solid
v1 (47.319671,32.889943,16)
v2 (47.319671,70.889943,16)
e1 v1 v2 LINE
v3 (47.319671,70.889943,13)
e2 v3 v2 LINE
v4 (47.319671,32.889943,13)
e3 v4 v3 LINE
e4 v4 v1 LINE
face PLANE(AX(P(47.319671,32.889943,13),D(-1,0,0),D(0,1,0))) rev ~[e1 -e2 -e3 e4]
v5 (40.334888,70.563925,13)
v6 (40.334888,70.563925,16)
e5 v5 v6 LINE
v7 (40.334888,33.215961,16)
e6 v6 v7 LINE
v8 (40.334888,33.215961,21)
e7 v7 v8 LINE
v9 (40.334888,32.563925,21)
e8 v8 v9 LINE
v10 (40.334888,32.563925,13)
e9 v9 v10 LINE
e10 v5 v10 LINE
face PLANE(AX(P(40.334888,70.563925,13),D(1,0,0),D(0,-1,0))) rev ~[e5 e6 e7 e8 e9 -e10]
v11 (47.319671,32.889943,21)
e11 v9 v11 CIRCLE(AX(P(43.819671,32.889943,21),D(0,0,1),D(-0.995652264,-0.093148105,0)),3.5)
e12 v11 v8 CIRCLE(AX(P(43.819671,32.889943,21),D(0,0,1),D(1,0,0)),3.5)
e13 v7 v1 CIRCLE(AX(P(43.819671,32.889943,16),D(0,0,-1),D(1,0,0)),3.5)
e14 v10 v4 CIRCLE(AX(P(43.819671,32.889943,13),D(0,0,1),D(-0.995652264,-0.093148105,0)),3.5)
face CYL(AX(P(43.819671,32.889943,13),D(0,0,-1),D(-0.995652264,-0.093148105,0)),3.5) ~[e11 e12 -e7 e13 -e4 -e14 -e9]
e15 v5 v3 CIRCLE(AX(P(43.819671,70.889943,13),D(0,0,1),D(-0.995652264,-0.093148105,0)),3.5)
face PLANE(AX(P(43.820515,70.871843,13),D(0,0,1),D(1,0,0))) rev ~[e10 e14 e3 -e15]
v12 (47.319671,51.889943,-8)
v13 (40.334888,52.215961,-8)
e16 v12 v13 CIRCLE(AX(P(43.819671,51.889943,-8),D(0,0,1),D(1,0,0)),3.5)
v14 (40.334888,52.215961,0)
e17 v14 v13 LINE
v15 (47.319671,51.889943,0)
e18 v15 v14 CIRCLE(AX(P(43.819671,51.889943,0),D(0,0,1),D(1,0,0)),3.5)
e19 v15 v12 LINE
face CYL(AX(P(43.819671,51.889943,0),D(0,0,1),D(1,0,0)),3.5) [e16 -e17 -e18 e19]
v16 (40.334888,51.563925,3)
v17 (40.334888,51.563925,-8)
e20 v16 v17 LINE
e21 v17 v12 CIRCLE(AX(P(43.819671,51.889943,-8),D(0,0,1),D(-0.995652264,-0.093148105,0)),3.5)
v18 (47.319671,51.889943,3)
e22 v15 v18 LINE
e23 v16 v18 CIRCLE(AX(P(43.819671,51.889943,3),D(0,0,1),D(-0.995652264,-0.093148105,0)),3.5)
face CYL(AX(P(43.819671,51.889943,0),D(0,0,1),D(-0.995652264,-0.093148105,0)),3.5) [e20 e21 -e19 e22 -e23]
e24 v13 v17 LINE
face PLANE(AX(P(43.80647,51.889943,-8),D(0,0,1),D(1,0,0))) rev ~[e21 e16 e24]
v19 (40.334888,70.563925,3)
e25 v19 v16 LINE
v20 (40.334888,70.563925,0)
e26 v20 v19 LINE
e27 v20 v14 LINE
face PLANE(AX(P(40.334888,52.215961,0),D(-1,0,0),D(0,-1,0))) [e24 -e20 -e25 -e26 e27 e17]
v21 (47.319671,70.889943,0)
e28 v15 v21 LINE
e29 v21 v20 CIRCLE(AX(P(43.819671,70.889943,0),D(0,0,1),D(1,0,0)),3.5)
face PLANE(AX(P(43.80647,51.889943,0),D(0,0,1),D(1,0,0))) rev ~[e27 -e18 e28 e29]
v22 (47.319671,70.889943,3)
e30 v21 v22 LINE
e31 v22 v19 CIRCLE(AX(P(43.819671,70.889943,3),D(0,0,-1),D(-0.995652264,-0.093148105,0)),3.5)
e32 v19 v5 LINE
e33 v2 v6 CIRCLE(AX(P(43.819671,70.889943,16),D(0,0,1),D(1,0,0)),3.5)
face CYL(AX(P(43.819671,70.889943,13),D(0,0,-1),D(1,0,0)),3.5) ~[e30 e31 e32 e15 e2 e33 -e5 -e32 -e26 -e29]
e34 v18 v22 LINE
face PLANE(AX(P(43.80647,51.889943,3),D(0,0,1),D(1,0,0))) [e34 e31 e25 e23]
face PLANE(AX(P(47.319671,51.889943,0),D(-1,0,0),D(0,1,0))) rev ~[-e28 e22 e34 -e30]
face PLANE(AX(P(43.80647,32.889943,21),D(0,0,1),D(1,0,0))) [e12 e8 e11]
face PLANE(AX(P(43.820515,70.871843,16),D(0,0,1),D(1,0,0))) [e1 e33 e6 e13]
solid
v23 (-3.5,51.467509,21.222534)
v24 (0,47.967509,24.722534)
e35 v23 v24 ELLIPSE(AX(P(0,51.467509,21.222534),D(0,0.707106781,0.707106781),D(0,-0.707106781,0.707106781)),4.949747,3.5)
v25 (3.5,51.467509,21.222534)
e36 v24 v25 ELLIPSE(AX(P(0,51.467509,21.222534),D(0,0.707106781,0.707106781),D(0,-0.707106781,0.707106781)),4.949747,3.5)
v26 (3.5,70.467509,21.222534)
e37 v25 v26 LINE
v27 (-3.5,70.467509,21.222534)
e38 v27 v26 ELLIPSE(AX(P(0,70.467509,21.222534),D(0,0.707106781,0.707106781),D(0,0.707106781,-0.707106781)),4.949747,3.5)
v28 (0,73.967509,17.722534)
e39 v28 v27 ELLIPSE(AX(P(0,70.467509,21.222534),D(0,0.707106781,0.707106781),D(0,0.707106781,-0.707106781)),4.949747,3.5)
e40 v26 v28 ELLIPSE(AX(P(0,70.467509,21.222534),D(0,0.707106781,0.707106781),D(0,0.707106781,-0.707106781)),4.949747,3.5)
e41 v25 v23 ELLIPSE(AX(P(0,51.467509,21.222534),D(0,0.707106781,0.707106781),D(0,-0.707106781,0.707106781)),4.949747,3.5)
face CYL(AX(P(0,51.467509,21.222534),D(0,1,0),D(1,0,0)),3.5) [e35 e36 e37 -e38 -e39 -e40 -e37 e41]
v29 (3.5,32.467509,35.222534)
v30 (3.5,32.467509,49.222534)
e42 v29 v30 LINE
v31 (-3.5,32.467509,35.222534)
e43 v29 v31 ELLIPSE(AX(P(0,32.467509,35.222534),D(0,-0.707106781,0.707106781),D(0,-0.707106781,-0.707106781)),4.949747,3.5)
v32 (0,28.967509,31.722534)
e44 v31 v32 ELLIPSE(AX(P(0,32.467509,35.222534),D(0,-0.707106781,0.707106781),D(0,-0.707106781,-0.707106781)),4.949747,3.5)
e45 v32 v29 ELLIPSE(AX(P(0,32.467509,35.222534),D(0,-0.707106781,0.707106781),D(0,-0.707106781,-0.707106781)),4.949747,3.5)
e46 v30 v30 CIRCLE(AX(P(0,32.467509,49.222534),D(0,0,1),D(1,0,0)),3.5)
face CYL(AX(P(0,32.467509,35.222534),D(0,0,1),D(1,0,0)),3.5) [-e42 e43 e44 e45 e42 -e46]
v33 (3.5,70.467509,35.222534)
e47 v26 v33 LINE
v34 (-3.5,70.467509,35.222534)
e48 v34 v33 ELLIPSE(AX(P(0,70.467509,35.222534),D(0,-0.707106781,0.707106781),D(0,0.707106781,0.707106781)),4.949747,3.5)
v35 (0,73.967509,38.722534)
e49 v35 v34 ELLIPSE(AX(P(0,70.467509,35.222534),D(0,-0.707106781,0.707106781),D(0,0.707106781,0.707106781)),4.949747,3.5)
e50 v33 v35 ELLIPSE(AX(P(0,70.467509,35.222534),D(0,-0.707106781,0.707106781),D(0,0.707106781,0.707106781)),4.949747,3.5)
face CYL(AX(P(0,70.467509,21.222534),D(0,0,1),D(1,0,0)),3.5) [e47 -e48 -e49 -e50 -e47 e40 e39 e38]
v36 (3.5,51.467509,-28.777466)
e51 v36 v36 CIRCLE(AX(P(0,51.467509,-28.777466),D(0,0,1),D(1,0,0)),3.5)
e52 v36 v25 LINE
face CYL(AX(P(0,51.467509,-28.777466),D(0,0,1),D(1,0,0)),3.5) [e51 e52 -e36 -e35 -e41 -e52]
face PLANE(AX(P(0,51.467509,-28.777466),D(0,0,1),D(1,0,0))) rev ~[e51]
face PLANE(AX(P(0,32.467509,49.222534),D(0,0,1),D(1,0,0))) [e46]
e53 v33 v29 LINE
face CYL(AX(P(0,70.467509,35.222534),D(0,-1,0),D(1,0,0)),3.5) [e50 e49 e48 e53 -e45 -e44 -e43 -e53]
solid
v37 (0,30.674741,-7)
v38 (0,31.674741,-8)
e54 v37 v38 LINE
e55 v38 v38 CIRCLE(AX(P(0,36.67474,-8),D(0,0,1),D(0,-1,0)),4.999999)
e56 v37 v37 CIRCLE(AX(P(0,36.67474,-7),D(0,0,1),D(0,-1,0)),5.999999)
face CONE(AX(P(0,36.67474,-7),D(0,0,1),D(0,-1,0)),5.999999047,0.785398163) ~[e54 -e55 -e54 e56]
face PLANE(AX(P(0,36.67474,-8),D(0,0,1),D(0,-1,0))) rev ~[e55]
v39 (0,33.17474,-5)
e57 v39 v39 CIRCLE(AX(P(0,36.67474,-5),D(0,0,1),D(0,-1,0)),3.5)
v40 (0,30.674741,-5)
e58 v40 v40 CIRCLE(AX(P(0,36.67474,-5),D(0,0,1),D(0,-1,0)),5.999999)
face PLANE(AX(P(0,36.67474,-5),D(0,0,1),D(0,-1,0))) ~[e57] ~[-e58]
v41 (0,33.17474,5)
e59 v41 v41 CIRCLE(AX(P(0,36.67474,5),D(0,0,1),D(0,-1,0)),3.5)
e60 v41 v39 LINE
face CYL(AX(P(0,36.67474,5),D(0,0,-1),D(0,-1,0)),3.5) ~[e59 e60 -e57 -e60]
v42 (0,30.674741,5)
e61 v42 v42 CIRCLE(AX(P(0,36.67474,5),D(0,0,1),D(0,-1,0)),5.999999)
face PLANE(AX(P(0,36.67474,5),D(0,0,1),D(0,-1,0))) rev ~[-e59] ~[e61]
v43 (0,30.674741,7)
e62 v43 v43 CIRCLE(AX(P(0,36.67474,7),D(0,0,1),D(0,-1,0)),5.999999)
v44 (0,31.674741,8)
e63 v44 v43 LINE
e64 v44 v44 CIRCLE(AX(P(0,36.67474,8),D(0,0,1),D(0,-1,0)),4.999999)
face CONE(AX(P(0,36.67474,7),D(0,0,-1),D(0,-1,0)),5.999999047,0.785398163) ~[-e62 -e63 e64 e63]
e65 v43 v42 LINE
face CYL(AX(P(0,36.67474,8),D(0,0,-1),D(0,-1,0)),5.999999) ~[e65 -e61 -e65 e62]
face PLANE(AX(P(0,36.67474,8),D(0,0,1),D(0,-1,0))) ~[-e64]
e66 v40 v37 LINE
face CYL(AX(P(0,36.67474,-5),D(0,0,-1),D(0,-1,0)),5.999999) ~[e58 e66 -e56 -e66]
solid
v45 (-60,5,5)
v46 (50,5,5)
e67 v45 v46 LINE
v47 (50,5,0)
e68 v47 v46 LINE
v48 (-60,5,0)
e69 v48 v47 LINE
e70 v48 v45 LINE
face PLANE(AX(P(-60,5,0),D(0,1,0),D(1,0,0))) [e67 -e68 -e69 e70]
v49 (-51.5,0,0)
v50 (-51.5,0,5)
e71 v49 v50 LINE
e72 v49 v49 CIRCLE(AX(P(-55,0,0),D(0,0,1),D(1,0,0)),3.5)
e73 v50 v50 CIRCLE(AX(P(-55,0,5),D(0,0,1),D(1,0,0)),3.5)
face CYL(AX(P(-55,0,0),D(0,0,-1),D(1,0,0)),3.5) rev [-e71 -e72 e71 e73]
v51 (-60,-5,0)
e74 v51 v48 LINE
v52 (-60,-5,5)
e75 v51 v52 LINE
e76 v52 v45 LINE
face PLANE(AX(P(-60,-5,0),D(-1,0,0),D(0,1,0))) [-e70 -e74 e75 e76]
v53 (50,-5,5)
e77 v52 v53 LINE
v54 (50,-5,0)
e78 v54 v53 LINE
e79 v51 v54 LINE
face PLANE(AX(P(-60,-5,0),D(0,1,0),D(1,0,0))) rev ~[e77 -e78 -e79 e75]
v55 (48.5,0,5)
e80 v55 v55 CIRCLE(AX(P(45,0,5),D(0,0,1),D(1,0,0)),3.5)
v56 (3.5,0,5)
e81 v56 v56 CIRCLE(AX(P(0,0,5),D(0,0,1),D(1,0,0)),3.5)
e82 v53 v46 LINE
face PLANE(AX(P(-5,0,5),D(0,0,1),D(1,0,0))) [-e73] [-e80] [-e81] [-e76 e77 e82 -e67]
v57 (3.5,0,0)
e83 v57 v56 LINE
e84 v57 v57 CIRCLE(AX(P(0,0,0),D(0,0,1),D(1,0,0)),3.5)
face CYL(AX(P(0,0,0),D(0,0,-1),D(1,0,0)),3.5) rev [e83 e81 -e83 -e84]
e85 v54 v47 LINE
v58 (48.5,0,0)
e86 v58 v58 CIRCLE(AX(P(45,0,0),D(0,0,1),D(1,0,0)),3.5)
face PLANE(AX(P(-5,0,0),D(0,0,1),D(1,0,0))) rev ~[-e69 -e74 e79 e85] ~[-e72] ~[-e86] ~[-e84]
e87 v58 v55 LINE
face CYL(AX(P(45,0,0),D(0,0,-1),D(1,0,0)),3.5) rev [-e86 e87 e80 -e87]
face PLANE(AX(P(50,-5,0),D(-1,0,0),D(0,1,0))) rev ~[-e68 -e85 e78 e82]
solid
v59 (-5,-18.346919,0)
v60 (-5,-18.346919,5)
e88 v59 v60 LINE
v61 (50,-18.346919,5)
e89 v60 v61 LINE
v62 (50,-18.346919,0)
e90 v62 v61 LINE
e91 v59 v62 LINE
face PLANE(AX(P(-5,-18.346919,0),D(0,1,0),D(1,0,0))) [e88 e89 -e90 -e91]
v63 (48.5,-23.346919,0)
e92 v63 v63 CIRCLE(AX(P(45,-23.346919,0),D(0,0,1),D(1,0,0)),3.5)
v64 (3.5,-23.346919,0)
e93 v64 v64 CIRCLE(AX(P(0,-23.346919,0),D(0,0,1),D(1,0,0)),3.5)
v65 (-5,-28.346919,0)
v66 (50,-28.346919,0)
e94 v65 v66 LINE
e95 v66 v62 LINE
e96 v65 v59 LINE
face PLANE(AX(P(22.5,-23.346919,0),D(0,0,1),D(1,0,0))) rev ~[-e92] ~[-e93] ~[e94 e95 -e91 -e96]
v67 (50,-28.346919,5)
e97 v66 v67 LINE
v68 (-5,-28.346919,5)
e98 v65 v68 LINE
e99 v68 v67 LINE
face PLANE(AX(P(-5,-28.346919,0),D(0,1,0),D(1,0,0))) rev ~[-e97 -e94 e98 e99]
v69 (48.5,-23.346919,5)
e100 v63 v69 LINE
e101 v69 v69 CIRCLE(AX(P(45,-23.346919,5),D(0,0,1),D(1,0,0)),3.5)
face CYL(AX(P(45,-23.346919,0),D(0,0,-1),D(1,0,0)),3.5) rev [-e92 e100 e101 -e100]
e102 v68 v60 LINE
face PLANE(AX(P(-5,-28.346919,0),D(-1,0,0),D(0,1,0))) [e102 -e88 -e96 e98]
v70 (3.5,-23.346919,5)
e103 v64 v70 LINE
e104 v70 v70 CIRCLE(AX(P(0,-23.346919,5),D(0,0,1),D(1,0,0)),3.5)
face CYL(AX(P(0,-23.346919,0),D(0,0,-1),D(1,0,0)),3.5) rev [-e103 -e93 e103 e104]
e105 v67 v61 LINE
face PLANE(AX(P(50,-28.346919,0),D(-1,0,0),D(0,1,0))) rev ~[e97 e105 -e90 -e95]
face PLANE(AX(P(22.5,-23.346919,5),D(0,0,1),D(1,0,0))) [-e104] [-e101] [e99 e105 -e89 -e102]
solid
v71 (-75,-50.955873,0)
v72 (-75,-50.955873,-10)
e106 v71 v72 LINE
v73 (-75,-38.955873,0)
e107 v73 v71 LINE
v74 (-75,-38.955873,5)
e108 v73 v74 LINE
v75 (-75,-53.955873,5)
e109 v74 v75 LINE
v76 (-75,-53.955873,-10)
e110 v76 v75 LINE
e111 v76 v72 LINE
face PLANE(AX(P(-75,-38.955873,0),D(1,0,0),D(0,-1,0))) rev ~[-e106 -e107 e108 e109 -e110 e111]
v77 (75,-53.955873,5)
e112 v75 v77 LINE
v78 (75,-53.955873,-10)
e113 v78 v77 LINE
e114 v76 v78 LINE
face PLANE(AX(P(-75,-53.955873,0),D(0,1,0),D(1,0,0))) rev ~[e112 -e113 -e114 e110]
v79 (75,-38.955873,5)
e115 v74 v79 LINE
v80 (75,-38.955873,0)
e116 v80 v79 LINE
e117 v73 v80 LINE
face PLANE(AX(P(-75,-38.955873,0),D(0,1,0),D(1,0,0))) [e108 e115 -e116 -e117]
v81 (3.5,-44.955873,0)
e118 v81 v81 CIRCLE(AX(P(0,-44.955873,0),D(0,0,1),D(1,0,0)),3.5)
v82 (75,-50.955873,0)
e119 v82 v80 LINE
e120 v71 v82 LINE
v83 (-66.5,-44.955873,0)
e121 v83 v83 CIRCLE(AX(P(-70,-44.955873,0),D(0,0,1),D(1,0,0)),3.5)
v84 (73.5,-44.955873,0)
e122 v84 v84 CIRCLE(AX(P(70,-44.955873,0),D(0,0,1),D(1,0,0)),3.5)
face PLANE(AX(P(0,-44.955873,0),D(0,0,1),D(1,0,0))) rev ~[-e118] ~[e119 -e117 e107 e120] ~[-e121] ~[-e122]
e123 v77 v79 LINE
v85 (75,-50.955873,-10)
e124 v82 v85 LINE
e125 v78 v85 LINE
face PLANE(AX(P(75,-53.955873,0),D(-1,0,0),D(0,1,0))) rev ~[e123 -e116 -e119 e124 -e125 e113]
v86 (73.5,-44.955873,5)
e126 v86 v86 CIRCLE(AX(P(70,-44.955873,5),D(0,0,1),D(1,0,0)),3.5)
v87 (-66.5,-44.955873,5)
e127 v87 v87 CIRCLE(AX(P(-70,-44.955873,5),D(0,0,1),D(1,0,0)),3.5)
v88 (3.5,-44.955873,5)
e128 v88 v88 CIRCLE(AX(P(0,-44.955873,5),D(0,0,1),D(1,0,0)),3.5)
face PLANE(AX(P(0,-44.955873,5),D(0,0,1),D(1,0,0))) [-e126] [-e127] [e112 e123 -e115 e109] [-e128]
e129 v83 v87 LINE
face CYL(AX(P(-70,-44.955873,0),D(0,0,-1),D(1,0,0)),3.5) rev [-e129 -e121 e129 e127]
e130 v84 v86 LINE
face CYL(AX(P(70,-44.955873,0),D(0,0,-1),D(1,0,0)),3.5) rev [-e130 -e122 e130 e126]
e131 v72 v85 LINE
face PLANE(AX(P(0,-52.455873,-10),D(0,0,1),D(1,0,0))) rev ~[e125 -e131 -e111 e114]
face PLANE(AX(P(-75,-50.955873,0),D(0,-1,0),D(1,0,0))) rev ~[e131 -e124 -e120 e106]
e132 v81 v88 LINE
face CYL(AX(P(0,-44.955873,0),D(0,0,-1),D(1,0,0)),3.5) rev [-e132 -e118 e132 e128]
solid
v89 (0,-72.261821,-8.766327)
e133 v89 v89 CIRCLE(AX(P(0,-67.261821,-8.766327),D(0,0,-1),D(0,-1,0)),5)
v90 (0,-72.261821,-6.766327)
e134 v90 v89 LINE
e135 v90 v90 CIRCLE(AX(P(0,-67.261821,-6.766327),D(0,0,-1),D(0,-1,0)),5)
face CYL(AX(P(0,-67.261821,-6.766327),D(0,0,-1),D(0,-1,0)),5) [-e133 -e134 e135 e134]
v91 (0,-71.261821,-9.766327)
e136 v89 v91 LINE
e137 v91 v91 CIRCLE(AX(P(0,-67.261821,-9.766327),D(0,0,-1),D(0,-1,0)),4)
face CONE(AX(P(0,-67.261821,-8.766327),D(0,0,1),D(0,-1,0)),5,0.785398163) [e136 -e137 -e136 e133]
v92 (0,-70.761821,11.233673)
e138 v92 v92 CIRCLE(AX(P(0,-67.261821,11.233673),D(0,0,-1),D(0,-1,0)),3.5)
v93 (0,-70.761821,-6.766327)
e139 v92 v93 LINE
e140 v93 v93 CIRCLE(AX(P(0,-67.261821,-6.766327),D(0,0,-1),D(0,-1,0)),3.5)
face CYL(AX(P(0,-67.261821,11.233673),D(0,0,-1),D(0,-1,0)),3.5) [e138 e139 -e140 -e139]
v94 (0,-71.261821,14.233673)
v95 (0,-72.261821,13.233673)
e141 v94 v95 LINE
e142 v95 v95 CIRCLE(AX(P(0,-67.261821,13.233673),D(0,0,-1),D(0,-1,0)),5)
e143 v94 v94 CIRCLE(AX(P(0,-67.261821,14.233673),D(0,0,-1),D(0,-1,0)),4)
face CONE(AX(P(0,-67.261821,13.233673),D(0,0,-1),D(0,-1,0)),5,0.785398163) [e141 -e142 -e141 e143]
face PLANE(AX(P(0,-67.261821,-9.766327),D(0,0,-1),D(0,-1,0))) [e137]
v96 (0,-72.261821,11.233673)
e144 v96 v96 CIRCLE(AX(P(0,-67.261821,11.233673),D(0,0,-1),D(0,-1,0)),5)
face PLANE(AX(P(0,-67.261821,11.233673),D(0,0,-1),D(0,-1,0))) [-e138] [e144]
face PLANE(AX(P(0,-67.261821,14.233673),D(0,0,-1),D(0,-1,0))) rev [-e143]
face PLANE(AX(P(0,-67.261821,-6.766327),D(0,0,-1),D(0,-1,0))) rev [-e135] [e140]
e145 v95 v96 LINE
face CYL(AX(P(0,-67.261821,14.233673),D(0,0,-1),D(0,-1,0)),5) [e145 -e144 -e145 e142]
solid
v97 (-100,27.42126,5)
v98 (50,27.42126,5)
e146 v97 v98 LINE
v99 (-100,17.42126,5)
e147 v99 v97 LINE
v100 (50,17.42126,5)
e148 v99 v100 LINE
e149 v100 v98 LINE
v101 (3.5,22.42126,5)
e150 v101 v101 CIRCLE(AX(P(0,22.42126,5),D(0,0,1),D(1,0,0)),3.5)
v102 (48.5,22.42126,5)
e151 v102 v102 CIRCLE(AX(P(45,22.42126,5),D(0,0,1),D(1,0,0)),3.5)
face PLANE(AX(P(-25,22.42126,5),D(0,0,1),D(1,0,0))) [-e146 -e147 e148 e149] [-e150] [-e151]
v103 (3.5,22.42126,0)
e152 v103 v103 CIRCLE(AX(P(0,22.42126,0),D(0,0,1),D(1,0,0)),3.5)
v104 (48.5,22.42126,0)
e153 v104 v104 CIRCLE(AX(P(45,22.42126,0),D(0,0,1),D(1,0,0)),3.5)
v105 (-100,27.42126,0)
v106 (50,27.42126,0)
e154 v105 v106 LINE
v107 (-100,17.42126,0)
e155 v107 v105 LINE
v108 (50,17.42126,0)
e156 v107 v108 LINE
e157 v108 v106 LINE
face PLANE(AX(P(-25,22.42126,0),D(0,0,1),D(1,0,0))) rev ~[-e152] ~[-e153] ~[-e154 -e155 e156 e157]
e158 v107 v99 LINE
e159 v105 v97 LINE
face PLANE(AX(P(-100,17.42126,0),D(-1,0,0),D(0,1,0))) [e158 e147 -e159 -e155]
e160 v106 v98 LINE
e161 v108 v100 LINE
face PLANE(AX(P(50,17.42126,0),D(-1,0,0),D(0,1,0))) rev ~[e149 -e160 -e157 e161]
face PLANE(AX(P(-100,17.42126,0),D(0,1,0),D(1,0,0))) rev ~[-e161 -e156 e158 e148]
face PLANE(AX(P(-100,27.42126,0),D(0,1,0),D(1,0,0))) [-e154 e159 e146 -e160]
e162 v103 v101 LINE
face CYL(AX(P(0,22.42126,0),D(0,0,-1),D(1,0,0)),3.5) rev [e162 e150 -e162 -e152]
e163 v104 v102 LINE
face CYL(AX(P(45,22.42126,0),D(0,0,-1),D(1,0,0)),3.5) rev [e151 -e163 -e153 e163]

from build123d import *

# Parameters (mm, degrees)
F0_W      = 110
F0_H      = 10
F0_R      = 3.5
F1_DEPTH  = 5
F2_W      = 150
F2_H      = 10
F2_R      = 3.5
F3_DEPTH  = 5
F4_W      = 55
F4_H      = 10
F4_R      = 3.5
F5_DEPTH  = 5
F6_W      = 150
F6_H      = 3
F7_DEPTH  = 10
F6_H_2    = 12
F6_R      = 3.5
F8_DEPTH  = 5
F11_SIZE  = 1
F14_R     = 3.5
F18_SIZE  = 1
F20_DEPTH = 3
F21_DEPTH = 5
F22_DEPTH = 13
F24_DEPTH = 13
F27_DEPTH = 3
F28_DEPTH = 8
F29_DEPTH = 8


# Not quite as in the source:
# - a feature names something its author has since deleted; it is built from what else it names


with BuildPart() as f1:
    # F0 (on Top) → F1 (new body)
    with BuildSketch(Plane.XY):
        with Locations((-5, 0)):
            Rectangle(F0_W, F0_H)
        with Locations((-55, 0)):
            Circle(F0_R, mode=Mode.SUBTRACT)
        Circle(F0_R, mode=Mode.SUBTRACT)
        with Locations((45, 0)):
            Circle(F0_R, mode=Mode.SUBTRACT)
    extrude(amount=F1_DEPTH)


with BuildPart() as f3:
    # F2 (on Top) → F3 (new body)
    with BuildSketch(Plane.XY):
        with Locations((-25, 22.4212598074)):
            Rectangle(F2_W, F2_H)
        with Locations((0, 22.4212598074)):
            Circle(F2_R, mode=Mode.SUBTRACT)
        with Locations((45, 22.4212598074)):
            Circle(F2_R, mode=Mode.SUBTRACT)
    extrude(amount=F3_DEPTH)


with BuildPart() as f5:
    # F4 (on Top) → F5 (new body)
    with BuildSketch(Plane.XY):
        with Locations((22.5, -23.3469191799)):
            Rectangle(F4_W, F4_H)
        with Locations((0, -23.3469191799)):
            Circle(F4_R, mode=Mode.SUBTRACT)
        with Locations((45, -23.3469191799)):
            Circle(F4_R, mode=Mode.SUBTRACT)
    extrude(amount=F5_DEPTH)


with BuildPart() as f7:
    # F6 (on Top) → F7 (new body)
    with BuildSketch(Plane.XY):
        with Locations((0, -52.4558726716)):
            Rectangle(F6_W, F6_H)
    extrude(amount=-F7_DEPTH)

    # F6 (on Top) → F8 (join)
    with BuildSketch(Plane.XY):
        with Locations((0, -44.9558726716)):
            Rectangle(F6_W, F6_H_2)
        with Locations((-70, -44.9558726716)):
            Circle(F6_R, mode=Mode.SUBTRACT)
        with Locations((0, -44.9558726716)):
            Circle(F6_R, mode=Mode.SUBTRACT)
        with Locations((70, -44.9558726716)):
            Circle(F6_R, mode=Mode.SUBTRACT)
        with Locations((0, -52.4558726716)):
            Rectangle(F6_W, F6_H)
    extrude(amount=F8_DEPTH)


with BuildPart() as f10:
    # F9 (on Right) → F10 (revolve)
    with BuildSketch(Plane.YZ):
        Polygon((33.1747402222, -5), (30.6747411754, -5), (30.6747411754, -8), (36.6747402222, -8), (36.6747402222, 8), (30.6747411754, 8), (30.6747411754, 5), (33.1747402222, 5), (33.1747402222, 0), align=None)
    revolve(axis=Axis((0, 36.6747402222, 0.4419543714), (0, 0, 1)))

    # F11
    f11_edges = [f10.edges().sort_by_distance(p)[0] for p in [
        (0, 42.674739, 8),
        (0, 42.674739, -8),
    ]]
    chamfer(f11_edges, length=F11_SIZE)


with BuildPart() as f15:
    # F15: sweep along a path in F12
    with BuildLine(Plane.YZ) as f15_path:
        Line((51.4675094231, -28.7774660638), (51.4675094231, 21.2225339362))
        Line((51.4675094231, 21.2225339362), (70.4675094231, 21.2225339362))
        Line((70.4675094231, 21.2225339362), (70.4675094231, 35.2225339362))
        Line((70.4675094231, 35.2225339362), (32.4675094231, 35.2225339362))
        Line((32.4675094231, 35.2225339362), (32.4675094231, 49.2225339362))
    # F14 (on plane+point) → F15 (sweep)
    with BuildSketch(Plane.XY.offset(-28.7774660638)):
        with Locations((0, 51.4675094231)):
            Circle(F14_R)
    sweep(path=f15_path.line, transition=Transition.RIGHT)


with BuildPart() as f17:
    # F16 (on Right) → F17 (revolve)
    with BuildSketch(Plane.YZ):
        Polygon((-67.2618212021, -9.7663268149), (-67.2618212021, 14.2336731851), (-72.2618212021, 14.2336731851), (-72.2618212021, 11.2336731851), (-70.7618212021, 11.2336731851), (-70.7618212021, 6.2336731851), (-70.7618212021, 3.2336731851), (-70.7618212021, -6.7663268149), (-72.2618212021, -6.7663268149), (-72.2618212021, -9.7663268149), align=None)
    revolve(axis=Axis((0, -67.2618212021, 2.2336731851), (0, 0, -1)))

    # F18
    f18_edges = [f17.edges().sort_by_distance(p)[0] for p in [
        (0, -62.261821, -9.766327),
        (0, -62.261821, 14.233673),
    ]]
    chamfer(f18_edges, length=F18_SIZE)


with BuildPart() as f20:
    # F19 (on Top) → F20 (new body)
    with BuildSketch(Plane.XY):
        with BuildLine():
            ThreePointArc((40.3348876363, 51.5639246599), (43.9828572132, 48.3937493663), (47.3196705598, 51.8899430275))
            ThreePointArc((47.3196705598, 51.8899430275), (43.9828572132, 55.3861366886), (40.3348876363, 52.215961395))
            Line((40.3348876363, 52.215961395), (40.3348876363, 51.5639246599))
        make_face()
        with BuildLine():
            ThreePointArc((40.3348876363, 52.215961395), (43.9828572132, 55.3861366886), (47.3196705598, 51.8899430275))
            Line((47.3196705598, 51.8899430275), (47.3196705598, 70.8899430275))
            ThreePointArc((47.3196705598, 70.8899430275), (43.9828572132, 67.3937493663), (40.3348876363, 70.5639246599))
            Line((40.3348876363, 70.5639246599), (40.3348876363, 52.215961395))
        make_face()
        with BuildLine():
            ThreePointArc((40.3348876363, 70.5639246599), (43.9828572132, 67.3937493663), (47.3196705598, 70.8899430275))
            ThreePointArc((47.3196705598, 70.8899430275), (43.6564839064, 74.3861366886), (40.3348876363, 70.5639246599))
        make_face()
    extrude(amount=F20_DEPTH)

    # F19 (on Top) → F24 (join)
    with BuildSketch(Plane.XY):
        with BuildLine():
            ThreePointArc((40.3348876363, 70.5639246599), (43.9828572132, 67.3937493663), (47.3196705598, 70.8899430275))
            ThreePointArc((47.3196705598, 70.8899430275), (43.6564839064, 74.3861366886), (40.3348876363, 70.5639246599))
        make_face()
    extrude(amount=F24_DEPTH)

    # F26 (on offset) → F27 (join)
    with BuildSketch(Plane.XY.offset(13)):
        with BuildLine():
            ThreePointArc((40.3348876363, 70.5639246599), (43.9828572132, 67.3937493663), (47.3196705598, 70.8899430275))
            ThreePointArc((47.3196705598, 70.8899430275), (43.6564839064, 74.3861366886), (40.3348876363, 70.5639246599))
        make_face()
        with BuildLine():
            ThreePointArc((40.3348876363, 52.215961395), (43.9828572132, 55.3861366886), (47.3196705598, 51.8899430275))
            Line((47.3196705598, 51.8899430275), (47.3196705598, 70.8899430275))
            ThreePointArc((47.3196705598, 70.8899430275), (43.9828572132, 67.3937493663), (40.3348876363, 70.5639246599))
            Line((40.3348876363, 70.5639246599), (40.3348876363, 52.215961395))
        make_face()
        with BuildLine():
            ThreePointArc((40.3348876363, 51.5639246599), (43.9828572132, 48.3937493663), (47.3196705598, 51.8899430275))
            ThreePointArc((47.3196705598, 51.8899430275), (43.9828572132, 55.3861366886), (40.3348876363, 52.215961395))
            Line((40.3348876363, 52.215961395), (40.3348876363, 51.5639246599))
        make_face()
        with BuildLine():
            ThreePointArc((40.3348876363, 33.215961395), (43.9828572132, 36.3861366886), (47.3196705598, 32.8899430275))
            Line((47.3196705598, 32.8899430275), (47.3196705598, 51.8899430275))
            ThreePointArc((47.3196705598, 51.8899430275), (43.9828572132, 48.3937493663), (40.3348876363, 51.5639246599))
            Line((40.3348876363, 51.5639246599), (40.3348876363, 33.215961395))
        make_face()
        with BuildLine():
            Line((40.3348876363, 33.215961395), (40.3348876363, 32.5639246599))
            ThreePointArc((40.3348876363, 32.5639246599), (43.9828572132, 29.3937493663), (47.3196705598, 32.8899430275))
            ThreePointArc((47.3196705598, 32.8899430275), (43.9828572132, 36.3861366886), (40.3348876363, 33.215961395))
        make_face()
    extrude(amount=F27_DEPTH)

    # F26 (on offset) → F28 (join)
    with BuildSketch(Plane.XY.offset(13)):
        with BuildLine():
            Line((40.3348876363, 33.215961395), (40.3348876363, 32.5639246599))
            ThreePointArc((40.3348876363, 32.5639246599), (43.9828572132, 29.3937493663), (47.3196705598, 32.8899430275))
            ThreePointArc((47.3196705598, 32.8899430275), (43.9828572132, 36.3861366886), (40.3348876363, 33.215961395))
        make_face()
    extrude(amount=F28_DEPTH)

    # F19 (on Top) → F29 (join)
    with BuildSketch(Plane.XY):
        with BuildLine():
            ThreePointArc((40.3348876363, 51.5639246599), (43.9828572132, 48.3937493663), (47.3196705598, 51.8899430275))
            ThreePointArc((47.3196705598, 51.8899430275), (43.9828572132, 55.3861366886), (40.3348876363, 52.215961395))
            Line((40.3348876363, 52.215961395), (40.3348876363, 51.5639246599))
        make_face()
    extrude(amount=-F29_DEPTH)


with BuildPart() as f21:
    # F19 (on Top) → F21 (new body)
    with BuildSketch(Plane.XY):
        with BuildLine():
            ThreePointArc((40.3348876363, 51.5639246599), (43.9828572132, 48.3937493663), (47.3196705598, 51.8899430275))
            ThreePointArc((47.3196705598, 51.8899430275), (43.9828572132, 55.3861366886), (40.3348876363, 52.215961395))
            Line((40.3348876363, 52.215961395), (40.3348876363, 51.5639246599))
        make_face()
    extrude(amount=-F21_DEPTH)


with BuildPart() as f22:
    # F19 (on Top) → F22 (new body)
    with BuildSketch(Plane.XY):
        with BuildLine():
            ThreePointArc((40.3348876363, 70.5639246599), (43.9828572132, 67.3937493663), (47.3196705598, 70.8899430275))
            ThreePointArc((47.3196705598, 70.8899430275), (43.6564839064, 74.3861366886), (40.3348876363, 70.5639246599))
        make_face()
    extrude(amount=F22_DEPTH)


solid = Compound([f1.part, f3.part, f5.part, f7.part, f10.part, f15.part, f17.part, f20.part])
